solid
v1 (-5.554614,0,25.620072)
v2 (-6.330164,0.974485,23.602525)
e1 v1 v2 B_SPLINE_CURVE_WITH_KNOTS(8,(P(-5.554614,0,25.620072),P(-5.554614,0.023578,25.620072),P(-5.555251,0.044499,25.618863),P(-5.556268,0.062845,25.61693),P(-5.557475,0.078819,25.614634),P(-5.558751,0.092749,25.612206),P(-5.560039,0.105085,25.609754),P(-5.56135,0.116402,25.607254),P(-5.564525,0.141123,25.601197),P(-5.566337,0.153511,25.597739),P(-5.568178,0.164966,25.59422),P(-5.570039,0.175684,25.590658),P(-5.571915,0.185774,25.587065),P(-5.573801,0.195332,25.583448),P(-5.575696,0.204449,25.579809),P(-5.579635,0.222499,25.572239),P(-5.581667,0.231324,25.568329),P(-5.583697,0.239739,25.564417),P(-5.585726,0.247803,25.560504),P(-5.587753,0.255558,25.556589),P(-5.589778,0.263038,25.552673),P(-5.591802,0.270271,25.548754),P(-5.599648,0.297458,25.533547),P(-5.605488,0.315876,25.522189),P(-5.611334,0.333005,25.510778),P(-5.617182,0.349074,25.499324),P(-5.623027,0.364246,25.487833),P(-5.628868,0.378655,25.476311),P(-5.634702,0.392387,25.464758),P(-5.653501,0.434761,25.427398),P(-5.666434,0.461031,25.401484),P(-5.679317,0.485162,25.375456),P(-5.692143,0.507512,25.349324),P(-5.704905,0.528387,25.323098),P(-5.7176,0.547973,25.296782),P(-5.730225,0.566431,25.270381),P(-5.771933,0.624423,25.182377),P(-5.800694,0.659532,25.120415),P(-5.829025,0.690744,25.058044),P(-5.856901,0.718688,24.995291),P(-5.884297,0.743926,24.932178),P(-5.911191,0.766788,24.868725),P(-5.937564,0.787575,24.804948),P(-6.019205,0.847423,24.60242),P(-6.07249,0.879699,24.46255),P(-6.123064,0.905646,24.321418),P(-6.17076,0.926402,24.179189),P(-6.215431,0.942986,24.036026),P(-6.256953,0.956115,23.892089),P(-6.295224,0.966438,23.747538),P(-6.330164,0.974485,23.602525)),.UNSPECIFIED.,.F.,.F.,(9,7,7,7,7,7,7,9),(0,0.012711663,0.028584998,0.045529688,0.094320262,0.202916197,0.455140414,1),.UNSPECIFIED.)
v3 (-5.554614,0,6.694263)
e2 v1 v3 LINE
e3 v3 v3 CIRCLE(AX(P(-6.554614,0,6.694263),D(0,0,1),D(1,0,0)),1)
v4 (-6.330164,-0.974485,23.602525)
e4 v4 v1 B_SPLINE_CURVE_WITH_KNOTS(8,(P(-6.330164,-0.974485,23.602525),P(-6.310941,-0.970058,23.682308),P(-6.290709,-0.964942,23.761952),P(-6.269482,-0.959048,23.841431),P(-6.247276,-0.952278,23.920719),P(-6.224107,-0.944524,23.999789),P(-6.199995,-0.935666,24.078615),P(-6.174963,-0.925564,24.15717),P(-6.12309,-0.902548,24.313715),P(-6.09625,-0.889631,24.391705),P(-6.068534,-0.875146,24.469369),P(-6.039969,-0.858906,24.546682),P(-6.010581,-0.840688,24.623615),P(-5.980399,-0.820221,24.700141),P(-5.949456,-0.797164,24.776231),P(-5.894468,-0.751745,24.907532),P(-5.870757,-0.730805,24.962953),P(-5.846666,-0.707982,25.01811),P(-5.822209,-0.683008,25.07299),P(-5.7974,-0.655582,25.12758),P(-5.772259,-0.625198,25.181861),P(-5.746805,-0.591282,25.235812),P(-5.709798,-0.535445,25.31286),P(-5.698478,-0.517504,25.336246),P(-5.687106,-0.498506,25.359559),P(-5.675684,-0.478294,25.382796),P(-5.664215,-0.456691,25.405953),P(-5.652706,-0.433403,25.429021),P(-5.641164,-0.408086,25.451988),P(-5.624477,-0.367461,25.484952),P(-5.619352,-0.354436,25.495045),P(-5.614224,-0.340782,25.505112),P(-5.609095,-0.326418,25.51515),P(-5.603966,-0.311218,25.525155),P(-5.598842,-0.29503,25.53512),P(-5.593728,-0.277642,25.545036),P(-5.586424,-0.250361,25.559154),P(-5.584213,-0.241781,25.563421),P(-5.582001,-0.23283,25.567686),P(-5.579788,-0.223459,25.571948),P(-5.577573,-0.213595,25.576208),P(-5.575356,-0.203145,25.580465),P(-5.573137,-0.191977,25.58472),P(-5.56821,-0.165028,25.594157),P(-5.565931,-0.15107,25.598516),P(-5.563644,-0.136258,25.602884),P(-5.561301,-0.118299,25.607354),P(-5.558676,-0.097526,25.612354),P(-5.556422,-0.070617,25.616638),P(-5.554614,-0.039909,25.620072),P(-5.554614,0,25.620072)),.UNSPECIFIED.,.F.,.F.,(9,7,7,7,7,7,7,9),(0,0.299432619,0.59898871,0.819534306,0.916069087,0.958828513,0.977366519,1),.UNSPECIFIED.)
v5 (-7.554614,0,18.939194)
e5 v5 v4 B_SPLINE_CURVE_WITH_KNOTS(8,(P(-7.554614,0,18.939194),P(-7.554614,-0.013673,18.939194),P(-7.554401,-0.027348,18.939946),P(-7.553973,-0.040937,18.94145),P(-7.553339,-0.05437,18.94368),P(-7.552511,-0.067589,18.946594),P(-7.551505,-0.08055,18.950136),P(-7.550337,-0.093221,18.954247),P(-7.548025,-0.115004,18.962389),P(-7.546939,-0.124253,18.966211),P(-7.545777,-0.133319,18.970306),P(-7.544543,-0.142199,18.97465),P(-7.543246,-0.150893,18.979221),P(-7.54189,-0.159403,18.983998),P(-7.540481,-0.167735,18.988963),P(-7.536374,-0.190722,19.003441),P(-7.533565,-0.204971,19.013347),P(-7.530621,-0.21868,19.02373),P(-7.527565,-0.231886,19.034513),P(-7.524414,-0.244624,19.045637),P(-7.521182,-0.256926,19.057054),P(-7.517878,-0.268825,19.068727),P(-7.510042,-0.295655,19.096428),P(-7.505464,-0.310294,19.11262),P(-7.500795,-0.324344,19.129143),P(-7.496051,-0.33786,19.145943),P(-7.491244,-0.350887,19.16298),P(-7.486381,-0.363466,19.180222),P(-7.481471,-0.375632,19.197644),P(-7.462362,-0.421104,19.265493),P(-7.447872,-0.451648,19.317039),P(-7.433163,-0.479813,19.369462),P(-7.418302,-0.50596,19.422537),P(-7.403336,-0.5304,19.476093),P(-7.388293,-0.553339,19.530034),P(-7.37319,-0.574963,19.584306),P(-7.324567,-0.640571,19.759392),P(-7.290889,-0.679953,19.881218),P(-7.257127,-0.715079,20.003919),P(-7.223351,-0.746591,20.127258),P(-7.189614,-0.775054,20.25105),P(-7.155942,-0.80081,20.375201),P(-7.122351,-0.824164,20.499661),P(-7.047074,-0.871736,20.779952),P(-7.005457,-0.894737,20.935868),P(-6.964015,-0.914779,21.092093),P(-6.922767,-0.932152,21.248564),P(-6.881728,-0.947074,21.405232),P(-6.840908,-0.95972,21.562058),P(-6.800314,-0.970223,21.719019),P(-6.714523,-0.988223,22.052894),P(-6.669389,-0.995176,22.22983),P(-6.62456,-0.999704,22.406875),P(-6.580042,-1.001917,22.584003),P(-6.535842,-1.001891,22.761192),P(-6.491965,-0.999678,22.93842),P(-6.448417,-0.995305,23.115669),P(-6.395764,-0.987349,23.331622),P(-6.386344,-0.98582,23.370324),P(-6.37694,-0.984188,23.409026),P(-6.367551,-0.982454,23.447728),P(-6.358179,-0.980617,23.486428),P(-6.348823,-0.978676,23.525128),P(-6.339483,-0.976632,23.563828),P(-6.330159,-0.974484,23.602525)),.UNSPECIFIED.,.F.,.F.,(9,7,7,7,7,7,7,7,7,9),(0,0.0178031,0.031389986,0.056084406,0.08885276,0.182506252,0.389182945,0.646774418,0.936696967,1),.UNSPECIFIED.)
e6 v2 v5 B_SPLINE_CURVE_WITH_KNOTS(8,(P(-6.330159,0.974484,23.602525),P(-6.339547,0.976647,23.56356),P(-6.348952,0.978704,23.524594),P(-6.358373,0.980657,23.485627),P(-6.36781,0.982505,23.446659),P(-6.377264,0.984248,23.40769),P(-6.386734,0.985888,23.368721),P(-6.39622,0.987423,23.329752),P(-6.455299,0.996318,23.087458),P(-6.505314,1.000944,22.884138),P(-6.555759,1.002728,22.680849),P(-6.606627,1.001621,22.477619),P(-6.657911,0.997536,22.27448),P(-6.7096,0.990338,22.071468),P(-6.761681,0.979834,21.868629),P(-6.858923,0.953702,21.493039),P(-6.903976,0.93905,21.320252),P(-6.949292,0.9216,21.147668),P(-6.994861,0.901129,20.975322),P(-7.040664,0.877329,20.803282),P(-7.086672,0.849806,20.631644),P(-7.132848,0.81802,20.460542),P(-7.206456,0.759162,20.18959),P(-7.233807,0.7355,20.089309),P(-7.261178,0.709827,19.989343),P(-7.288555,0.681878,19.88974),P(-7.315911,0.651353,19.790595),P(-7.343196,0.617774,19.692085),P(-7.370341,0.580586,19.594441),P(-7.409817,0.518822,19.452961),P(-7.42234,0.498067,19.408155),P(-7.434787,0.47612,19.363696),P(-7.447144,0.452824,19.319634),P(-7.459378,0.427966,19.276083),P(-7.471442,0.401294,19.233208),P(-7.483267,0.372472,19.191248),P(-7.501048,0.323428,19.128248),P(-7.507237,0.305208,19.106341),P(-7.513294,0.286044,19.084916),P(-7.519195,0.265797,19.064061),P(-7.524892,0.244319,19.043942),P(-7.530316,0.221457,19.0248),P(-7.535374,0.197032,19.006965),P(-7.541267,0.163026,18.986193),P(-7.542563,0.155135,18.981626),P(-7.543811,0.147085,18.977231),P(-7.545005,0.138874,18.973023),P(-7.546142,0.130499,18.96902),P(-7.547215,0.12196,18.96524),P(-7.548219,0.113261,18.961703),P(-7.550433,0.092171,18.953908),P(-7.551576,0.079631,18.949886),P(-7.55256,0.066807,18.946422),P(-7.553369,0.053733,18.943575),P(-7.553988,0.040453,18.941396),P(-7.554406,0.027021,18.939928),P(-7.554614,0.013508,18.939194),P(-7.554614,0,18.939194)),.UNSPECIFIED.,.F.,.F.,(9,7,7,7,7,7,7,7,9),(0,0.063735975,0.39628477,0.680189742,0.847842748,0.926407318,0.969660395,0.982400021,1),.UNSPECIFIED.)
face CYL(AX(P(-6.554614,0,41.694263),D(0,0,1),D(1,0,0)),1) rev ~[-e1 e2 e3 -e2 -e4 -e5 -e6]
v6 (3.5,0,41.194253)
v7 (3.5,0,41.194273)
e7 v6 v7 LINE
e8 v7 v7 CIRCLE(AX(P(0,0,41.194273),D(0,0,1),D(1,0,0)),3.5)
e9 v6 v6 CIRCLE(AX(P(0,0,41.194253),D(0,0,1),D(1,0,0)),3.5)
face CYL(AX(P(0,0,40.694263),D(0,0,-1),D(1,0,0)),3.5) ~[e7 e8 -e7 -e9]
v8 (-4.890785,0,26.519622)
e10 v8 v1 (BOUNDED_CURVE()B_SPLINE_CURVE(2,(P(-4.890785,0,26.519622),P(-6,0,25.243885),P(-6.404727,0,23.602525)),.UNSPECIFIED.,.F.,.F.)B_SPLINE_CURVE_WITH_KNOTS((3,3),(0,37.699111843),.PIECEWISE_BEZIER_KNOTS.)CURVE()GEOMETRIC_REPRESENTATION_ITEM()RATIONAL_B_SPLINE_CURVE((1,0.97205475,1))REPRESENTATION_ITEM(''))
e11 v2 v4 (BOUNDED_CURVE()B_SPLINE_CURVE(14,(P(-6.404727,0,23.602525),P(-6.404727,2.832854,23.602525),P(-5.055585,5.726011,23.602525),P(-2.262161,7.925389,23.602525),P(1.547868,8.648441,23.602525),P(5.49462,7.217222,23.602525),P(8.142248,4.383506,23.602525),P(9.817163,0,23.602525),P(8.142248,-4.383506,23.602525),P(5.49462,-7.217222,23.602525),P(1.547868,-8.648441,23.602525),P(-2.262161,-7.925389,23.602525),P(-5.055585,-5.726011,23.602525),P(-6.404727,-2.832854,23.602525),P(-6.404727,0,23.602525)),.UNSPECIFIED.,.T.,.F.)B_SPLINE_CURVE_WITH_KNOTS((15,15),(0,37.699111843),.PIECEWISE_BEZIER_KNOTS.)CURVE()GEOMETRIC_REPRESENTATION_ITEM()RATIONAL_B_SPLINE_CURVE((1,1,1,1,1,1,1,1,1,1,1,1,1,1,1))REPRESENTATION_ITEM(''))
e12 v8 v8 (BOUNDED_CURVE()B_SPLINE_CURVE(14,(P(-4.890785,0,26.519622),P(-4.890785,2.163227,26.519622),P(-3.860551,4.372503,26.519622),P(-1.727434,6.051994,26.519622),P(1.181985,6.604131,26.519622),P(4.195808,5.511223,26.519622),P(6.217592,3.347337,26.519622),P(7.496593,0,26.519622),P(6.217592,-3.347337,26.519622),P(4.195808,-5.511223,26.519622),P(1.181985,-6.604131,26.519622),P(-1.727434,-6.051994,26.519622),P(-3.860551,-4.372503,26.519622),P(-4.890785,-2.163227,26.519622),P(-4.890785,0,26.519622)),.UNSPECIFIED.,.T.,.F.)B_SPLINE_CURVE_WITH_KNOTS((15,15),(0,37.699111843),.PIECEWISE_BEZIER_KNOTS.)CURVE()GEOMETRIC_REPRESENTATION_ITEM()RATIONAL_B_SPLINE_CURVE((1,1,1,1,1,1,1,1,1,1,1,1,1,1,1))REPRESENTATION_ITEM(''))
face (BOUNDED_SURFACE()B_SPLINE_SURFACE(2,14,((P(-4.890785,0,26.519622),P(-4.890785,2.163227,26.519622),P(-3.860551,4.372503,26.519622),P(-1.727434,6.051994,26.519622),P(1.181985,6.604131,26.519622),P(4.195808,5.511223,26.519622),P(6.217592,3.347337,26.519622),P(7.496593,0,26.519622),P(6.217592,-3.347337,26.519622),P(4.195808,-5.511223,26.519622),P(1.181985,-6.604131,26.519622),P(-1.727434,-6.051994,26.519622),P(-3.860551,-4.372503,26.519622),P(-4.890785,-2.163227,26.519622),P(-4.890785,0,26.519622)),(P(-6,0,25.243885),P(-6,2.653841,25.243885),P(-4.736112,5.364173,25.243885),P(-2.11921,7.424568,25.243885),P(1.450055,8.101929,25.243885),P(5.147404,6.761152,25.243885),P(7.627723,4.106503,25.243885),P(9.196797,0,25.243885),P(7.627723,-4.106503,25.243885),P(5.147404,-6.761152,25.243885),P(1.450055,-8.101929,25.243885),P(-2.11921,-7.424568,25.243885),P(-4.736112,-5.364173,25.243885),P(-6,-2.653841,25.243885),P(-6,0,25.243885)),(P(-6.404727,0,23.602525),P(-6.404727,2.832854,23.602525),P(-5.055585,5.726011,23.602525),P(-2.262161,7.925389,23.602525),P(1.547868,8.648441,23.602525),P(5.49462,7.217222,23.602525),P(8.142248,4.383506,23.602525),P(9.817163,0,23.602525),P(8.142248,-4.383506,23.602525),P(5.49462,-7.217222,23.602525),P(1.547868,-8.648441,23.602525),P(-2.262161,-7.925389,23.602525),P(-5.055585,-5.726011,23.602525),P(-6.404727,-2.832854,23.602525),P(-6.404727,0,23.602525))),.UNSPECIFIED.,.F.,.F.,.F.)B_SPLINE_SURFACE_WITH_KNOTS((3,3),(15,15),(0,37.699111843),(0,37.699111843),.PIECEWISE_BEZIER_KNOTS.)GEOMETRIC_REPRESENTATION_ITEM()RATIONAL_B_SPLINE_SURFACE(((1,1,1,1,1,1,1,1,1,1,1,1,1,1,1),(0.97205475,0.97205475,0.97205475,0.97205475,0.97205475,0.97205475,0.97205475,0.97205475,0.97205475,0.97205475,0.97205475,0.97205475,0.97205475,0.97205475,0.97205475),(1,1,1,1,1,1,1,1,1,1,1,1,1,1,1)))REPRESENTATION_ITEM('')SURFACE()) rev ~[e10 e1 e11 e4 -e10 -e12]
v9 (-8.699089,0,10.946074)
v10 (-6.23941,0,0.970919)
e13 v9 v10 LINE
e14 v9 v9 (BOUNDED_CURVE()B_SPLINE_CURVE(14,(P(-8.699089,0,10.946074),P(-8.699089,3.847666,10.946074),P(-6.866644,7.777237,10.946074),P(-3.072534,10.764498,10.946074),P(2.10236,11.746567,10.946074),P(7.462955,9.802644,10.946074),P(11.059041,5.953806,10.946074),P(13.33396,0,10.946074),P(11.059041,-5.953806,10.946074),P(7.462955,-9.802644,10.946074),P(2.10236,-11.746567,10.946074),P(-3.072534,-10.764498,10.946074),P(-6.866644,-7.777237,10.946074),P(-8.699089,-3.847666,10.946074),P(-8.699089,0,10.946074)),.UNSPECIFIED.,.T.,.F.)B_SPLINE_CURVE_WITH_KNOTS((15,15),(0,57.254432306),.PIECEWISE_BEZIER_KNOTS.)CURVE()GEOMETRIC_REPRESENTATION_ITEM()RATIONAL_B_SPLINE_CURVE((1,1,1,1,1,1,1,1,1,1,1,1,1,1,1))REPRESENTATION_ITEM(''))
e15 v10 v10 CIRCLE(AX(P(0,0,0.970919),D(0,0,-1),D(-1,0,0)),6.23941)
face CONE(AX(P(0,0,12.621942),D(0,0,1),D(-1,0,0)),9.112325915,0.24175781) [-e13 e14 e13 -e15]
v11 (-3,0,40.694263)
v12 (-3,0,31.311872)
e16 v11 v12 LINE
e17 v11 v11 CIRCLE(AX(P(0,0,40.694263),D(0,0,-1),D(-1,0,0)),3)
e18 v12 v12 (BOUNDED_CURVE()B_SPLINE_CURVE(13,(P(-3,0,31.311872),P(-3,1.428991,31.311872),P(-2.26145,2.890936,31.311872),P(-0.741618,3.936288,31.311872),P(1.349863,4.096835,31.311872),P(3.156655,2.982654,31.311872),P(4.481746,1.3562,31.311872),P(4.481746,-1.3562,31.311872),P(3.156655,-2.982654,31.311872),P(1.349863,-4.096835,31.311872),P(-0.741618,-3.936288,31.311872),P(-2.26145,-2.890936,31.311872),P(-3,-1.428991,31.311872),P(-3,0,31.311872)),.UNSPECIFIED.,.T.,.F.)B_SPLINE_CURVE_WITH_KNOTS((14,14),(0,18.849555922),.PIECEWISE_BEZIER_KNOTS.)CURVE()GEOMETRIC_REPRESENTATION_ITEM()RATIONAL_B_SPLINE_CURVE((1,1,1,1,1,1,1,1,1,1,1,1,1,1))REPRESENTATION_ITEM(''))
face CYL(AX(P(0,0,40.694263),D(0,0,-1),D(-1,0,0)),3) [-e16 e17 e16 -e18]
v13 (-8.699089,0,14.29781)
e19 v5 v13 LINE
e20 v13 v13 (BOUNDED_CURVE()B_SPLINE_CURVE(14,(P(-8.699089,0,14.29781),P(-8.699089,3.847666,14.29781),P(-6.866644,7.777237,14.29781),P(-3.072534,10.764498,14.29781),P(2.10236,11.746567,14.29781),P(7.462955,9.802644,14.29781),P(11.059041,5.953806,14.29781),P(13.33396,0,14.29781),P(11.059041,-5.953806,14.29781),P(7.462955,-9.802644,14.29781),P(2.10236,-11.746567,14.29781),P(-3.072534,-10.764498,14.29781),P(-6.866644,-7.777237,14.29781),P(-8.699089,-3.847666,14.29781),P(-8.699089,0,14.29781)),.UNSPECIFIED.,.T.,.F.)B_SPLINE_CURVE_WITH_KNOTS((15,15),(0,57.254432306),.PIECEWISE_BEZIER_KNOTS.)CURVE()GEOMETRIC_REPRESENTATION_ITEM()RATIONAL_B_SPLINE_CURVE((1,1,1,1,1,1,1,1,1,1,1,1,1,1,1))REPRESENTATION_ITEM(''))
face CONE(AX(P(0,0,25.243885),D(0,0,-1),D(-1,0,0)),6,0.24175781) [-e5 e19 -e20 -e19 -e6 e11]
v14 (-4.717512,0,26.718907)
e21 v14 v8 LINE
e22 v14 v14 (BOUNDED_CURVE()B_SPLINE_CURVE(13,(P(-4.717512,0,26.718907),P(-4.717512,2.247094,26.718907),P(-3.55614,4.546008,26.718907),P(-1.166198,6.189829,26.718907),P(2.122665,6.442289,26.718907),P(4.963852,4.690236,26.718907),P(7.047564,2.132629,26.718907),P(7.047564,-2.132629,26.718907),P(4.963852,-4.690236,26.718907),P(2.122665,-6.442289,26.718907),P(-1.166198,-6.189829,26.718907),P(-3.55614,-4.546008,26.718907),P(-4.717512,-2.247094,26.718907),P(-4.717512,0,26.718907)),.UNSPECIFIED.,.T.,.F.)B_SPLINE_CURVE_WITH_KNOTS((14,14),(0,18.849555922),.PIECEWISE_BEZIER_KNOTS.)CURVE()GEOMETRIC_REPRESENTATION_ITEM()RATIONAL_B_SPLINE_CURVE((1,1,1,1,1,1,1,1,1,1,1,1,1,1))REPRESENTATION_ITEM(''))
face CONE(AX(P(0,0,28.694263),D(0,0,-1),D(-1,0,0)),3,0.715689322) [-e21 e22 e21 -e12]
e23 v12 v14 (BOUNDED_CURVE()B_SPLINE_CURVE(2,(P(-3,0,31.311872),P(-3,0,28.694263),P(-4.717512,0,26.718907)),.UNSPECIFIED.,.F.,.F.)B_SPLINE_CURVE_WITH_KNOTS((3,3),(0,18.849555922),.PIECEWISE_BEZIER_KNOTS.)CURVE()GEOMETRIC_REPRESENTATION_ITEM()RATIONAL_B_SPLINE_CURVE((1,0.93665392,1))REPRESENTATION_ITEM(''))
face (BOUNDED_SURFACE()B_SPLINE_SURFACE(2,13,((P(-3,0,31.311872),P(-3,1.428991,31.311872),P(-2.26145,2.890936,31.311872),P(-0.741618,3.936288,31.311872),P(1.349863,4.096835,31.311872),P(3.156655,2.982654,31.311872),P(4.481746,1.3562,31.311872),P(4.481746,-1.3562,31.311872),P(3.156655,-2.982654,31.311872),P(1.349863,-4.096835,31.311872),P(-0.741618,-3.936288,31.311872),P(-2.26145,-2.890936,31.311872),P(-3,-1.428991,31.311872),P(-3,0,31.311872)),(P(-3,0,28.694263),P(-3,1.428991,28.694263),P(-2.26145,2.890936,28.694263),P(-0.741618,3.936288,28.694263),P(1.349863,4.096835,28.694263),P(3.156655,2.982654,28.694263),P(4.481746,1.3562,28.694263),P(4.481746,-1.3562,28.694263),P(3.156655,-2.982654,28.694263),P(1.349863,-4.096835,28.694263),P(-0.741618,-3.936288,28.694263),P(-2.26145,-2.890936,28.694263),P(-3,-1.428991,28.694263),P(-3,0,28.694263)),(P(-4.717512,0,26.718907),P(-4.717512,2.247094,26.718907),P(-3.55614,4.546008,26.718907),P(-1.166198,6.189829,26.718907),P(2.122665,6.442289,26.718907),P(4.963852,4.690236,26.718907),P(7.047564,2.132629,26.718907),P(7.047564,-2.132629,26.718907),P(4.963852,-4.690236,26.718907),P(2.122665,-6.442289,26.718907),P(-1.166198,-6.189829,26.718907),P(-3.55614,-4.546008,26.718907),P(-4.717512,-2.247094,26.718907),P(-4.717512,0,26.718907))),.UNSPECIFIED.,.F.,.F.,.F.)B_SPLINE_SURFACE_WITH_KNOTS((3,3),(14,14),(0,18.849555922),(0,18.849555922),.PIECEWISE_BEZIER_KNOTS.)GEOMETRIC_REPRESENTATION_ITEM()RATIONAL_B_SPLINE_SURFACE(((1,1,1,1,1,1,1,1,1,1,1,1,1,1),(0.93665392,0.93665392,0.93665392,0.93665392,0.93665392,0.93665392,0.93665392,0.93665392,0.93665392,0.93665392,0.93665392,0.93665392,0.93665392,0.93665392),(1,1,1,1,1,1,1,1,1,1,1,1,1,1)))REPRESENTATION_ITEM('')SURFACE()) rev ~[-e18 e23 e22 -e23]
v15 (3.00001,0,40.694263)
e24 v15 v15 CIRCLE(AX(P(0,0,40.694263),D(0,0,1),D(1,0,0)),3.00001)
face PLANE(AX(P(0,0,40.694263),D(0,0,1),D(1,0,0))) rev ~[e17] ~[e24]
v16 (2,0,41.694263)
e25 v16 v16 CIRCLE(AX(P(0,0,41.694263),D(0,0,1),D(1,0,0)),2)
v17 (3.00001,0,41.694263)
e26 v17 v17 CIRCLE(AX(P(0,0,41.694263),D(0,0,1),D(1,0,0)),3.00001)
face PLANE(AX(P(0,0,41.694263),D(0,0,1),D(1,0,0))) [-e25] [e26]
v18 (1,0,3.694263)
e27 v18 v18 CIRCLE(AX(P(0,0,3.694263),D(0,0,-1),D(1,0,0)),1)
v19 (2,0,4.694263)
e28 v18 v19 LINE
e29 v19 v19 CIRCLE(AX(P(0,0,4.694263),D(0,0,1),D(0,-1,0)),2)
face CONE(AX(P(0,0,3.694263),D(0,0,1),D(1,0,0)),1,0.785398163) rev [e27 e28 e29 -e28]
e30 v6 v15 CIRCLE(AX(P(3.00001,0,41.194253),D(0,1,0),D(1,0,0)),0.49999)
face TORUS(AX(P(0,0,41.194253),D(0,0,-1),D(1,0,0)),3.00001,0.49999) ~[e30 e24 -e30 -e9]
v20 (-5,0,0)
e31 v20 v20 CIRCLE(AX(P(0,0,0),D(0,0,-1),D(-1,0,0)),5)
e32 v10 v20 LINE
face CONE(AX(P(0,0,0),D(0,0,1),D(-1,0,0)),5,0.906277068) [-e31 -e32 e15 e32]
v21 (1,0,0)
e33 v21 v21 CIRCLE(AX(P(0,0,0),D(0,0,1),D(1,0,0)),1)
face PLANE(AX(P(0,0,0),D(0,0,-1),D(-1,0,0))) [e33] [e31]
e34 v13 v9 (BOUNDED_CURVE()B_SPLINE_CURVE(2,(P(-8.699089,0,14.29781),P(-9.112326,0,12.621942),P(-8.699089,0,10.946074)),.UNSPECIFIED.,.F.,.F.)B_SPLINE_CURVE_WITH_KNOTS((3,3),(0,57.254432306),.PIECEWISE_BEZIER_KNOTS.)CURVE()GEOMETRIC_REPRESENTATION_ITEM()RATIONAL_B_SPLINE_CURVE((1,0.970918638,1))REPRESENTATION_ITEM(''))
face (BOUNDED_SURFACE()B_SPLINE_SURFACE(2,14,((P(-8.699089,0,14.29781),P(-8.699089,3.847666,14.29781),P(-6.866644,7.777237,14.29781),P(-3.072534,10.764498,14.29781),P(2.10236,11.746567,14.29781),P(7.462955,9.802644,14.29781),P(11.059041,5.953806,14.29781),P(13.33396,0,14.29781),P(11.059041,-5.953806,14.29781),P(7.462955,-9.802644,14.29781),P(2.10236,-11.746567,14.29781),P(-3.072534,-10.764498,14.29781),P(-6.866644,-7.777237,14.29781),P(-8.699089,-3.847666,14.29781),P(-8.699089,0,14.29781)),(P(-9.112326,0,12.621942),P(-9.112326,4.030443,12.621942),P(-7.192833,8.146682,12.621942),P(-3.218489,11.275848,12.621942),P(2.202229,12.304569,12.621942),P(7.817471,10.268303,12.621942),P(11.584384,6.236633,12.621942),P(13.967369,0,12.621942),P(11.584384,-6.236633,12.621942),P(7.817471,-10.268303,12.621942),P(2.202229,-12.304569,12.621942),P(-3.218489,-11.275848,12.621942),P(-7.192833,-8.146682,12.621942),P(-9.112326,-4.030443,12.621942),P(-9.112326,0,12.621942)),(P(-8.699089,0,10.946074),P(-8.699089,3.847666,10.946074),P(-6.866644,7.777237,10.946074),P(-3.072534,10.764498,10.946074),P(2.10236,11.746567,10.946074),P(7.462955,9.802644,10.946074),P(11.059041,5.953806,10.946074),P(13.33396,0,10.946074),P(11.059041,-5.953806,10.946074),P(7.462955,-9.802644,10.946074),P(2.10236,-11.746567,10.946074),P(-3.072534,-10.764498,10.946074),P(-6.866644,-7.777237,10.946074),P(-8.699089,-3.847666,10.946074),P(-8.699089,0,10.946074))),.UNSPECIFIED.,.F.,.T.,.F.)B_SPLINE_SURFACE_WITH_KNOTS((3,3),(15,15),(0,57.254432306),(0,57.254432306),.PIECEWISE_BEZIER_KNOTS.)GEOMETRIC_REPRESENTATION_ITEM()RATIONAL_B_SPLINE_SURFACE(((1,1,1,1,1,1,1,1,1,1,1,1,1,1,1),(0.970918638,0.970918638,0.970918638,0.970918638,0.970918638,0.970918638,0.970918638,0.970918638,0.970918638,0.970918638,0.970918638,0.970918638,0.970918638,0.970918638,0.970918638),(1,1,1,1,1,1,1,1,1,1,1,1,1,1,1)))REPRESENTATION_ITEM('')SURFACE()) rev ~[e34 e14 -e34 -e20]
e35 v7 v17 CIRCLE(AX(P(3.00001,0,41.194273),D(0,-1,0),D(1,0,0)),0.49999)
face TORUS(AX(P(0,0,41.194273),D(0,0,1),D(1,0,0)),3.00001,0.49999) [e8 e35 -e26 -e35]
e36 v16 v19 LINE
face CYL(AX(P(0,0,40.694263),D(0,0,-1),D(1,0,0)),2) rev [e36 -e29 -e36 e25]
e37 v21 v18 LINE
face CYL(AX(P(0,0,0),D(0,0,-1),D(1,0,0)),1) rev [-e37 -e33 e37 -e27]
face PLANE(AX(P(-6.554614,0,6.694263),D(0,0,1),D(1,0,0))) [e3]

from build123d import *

# Parameters (mm, degrees)
F2_R        = 1
F3_DEPTH    = 10
F4_R        = 3.5
F4_R_2      = 2
F5_DEPTH    = 1
F6_DEPTH    = 35
F7_S5_R     = 2
F7_T6_DEPTH = 6
F8_R        = 0.49999
F9_R        = 7
F10_SIZE    = 1
F11_R       = 1
F12_DEPTH   = 35


# Not quite as in the source:
# - a fillet or chamfer that OpenCascade refuses, or shapes differently, is made with other operations: its cross-section is extruded or revolved along the edge and cut away or added
# - a fillet or chamfer is up to 0.001 mm smaller than in the source, because OpenCascade refuses the exact size


with BuildPart() as f1:
    # F0 (on Front) → F1 (revolve)
    with BuildSketch(Plane.XZ):
        Polygon((-6, 0), (0, 0), (0, 40.6942627281), (-3, 40.6942627281), (-3, 28.6942627281), (-6, 25.2438845978), (-9.1123259154, 12.6219422989), align=None)
    revolve(axis=Axis((0, 0, 20.347131364), (0, 0, -1)))

    # F2 (on Top) → F3 (cut)
    with BuildSketch(Plane.XY):
        Circle(F2_R)
    extrude(amount=F3_DEPTH, mode=Mode.SUBTRACT)

    # F4 (on face) → F5 (join)
    with BuildSketch(Plane.XY.offset(40.6942627281)):
        Circle(F4_R)
        Circle(F4_R_2, mode=Mode.SUBTRACT)
    extrude(amount=F5_DEPTH)

    # F6 (cut): a face of the model
    f6_faces = [f1.faces().sort_by_distance(p)[0] for p in [
        (0, 0, 40.6942627281),
    ]]
    extrude(f6_faces, amount=-F6_DEPTH, mode=Mode.SUBTRACT)

    # F7: chamfer of 2 on 1 edges, made by hand


with BuildPart() as f7_tool2:
    # F7_s3 → F7_t4 (revolve)
    with BuildSketch(Plane.XZ):
        Polygon((1, 3.6942627281), (3, 5.6942627281), (1, 5.6942627281), align=None)
    revolve(axis=Axis((0, 0, 5.6942627281), (0, 0, -1)))

    # F7_s5 → F7_t6 (intersect, symmetric)
    with BuildSketch(Plane.XY.offset(4.7)):
        Circle(F7_S5_R)
    extrude(amount=F7_T6_DEPTH, both=True, mode=Mode.INTERSECT)


with BuildPart() as f1_1:
    add(f1.part)

    # F7_t1: cut F7_tool2
    add(f7_tool2.part, mode=Mode.SUBTRACT)

    # F8 (radius 0.5 in the source; OpenCascade refuses exactly that, so slightly less here)
    f8_edges = [f1_1.edges().sort_by_distance(p)[0] for p in [
        (-3.5, 0, 41.694263),
        (-3.5, 0, 40.694263),
    ]]
    fillet(f8_edges, radius=F8_R)

    # F9
    f9_edges = [f1_1.edges().sort_by_distance(p)[0] for p in [
        (3, 0, 28.694263),
        (6, 0, 25.243885),
        (9.112326, 0, 12.621942),
    ]]
    fillet(f9_edges, radius=F9_R)

    # F10
    f10_edges = [f1_1.edges().sort_by_distance(p)[0] for p in [
        (6, 0, 0),
    ]]
    chamfer(f10_edges, length=F10_SIZE)

    # F11 (on face) → F12 (cut)
    with BuildSketch(Plane.XY.offset(41.6942627281)):
        with Locations((-6.5546142869, 0)):
            Circle(F11_R)
    extrude(amount=-F12_DEPTH, mode=Mode.SUBTRACT)


solid = f1_1.part
